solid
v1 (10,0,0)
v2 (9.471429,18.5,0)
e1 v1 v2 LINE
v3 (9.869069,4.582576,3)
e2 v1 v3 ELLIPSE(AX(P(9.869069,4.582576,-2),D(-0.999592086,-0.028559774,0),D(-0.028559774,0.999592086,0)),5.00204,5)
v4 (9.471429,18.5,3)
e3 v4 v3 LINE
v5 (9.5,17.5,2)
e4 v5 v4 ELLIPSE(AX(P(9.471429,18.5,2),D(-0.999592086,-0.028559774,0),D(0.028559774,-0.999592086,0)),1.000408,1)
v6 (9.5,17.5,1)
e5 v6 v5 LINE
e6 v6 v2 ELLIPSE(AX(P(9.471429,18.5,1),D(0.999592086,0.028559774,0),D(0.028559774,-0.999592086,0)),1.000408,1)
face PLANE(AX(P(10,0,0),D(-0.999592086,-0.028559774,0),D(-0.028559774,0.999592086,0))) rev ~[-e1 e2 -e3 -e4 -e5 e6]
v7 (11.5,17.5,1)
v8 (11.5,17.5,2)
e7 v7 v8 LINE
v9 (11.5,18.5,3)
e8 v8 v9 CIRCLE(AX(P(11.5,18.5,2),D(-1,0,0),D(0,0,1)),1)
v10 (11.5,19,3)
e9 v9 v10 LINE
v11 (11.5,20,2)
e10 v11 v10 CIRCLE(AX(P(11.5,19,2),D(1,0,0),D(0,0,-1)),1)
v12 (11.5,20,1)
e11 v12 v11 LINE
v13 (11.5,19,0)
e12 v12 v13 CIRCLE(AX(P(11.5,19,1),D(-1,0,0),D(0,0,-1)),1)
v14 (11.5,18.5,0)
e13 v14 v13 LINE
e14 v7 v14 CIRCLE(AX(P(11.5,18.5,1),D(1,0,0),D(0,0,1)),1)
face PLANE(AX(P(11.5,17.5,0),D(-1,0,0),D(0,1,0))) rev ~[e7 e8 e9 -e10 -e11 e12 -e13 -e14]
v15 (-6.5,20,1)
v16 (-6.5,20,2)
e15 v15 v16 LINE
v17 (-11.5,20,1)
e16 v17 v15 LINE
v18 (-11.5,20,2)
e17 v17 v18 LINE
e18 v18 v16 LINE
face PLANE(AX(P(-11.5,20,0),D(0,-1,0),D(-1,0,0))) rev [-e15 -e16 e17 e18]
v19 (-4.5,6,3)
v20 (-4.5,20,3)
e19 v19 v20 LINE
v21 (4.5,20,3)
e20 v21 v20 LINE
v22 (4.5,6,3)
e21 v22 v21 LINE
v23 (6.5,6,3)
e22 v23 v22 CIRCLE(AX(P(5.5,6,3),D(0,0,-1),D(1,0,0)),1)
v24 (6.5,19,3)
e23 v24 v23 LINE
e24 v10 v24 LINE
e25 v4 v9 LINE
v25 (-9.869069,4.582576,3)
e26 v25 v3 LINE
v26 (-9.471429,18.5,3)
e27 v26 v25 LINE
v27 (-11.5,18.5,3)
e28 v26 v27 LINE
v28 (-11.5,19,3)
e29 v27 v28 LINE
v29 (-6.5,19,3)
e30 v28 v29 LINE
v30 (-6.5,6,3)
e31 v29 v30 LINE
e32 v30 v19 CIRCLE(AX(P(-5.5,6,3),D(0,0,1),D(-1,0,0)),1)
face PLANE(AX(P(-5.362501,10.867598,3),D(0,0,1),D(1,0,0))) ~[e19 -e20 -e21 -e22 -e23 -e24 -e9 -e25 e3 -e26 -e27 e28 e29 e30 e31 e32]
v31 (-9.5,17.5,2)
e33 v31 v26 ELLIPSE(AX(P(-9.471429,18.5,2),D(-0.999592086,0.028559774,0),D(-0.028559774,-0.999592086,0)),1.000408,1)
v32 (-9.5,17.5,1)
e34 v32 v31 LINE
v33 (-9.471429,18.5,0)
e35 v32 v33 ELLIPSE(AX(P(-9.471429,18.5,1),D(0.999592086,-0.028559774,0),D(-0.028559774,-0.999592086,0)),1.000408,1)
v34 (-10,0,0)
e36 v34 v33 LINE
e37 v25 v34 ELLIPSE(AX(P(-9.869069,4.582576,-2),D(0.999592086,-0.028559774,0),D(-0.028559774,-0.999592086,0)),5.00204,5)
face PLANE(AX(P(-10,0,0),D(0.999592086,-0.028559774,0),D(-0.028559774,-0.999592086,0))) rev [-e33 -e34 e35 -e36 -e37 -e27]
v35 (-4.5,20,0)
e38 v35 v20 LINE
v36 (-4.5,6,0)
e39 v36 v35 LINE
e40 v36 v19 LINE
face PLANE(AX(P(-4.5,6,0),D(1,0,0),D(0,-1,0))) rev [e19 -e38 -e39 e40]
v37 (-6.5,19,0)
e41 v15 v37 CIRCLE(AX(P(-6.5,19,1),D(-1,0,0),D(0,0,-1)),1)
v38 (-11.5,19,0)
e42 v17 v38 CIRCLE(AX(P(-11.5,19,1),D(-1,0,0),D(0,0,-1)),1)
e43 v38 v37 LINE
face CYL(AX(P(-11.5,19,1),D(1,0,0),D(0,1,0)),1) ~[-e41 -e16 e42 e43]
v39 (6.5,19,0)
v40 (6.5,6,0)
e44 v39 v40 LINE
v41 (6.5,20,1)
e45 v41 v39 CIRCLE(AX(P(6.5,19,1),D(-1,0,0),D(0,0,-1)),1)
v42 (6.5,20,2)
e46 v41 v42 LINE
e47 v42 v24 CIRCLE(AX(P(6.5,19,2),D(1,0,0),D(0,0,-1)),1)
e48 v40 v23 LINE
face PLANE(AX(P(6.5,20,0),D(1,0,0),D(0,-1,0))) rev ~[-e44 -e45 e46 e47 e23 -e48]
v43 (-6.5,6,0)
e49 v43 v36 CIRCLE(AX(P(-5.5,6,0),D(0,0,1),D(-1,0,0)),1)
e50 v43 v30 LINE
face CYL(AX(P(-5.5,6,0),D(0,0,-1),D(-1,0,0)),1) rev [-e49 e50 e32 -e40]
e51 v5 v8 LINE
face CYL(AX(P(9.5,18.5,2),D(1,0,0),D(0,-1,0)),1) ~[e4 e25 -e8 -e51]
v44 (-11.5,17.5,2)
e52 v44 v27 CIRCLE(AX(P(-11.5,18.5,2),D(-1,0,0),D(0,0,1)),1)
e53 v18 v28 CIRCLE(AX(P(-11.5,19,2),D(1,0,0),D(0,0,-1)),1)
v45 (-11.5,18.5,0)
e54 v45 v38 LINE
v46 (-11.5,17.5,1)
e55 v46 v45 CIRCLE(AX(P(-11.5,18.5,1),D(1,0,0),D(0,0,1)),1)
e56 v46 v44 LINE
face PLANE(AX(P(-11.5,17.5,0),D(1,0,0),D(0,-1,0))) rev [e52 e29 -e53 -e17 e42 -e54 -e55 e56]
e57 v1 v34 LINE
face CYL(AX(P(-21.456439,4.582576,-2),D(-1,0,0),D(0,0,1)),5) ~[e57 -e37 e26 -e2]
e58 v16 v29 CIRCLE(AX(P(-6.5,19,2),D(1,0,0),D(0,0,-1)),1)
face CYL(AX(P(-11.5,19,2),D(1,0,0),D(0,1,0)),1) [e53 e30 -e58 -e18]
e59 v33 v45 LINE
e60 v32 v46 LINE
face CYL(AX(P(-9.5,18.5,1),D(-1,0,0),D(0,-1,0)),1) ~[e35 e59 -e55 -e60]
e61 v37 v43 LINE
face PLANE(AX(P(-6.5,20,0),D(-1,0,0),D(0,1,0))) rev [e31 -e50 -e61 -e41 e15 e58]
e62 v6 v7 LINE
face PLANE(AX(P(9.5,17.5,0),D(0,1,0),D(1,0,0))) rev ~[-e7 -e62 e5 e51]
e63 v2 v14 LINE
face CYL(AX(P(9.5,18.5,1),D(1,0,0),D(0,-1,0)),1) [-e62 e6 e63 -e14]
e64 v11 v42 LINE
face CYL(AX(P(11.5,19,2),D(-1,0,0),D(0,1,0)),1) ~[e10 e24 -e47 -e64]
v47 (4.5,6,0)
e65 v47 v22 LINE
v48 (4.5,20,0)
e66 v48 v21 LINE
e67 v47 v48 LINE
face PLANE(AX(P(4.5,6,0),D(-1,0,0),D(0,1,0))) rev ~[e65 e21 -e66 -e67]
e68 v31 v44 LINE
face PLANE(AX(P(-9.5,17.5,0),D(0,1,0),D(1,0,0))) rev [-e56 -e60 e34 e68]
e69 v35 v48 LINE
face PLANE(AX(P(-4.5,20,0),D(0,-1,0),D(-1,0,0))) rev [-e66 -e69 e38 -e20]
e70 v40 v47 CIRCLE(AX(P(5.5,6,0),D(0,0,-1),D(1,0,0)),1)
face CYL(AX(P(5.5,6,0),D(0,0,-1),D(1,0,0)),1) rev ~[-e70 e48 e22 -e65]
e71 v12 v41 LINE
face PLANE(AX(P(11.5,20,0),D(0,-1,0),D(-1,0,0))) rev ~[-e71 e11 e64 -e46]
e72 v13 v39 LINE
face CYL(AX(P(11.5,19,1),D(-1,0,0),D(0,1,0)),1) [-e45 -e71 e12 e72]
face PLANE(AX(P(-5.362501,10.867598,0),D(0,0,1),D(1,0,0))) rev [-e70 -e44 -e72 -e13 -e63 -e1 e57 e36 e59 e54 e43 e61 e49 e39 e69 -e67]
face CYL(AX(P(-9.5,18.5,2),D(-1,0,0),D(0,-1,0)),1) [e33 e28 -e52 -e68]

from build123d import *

# Parameters (mm, degrees)
F4_DEPTH    = 3
F1_R        = 1
F3_T1_DEPTH = 42.9128784748


# Not quite as in the source:
# - a fillet or chamfer that OpenCascade refuses, or shapes differently, is made with other operations: its cross-section is extruded or revolved along the edge and cut away or added


with BuildPart() as f4:
    # F0 (on Top) → F4 (new body)
    with BuildSketch(Plane.XY):
        with BuildLine():
            Line((0, 20), (0, 0))
            Line((0, 0), (10, 0))
            Line((10, 0), (9.5, 17.5))
            Line((9.5, 17.5), (11.5, 17.5))
            Line((11.5, 17.5), (11.5, 20))
            Line((11.5, 20), (6.5, 20))
            Line((6.5, 20), (6.5, 6))
            ThreePointArc((6.5, 6), (5.5, 5), (4.5, 6))
            Line((4.5, 6), (4.5, 20))
            Line((4.5, 20), (0, 20))
        make_face()
    extrude(amount=F4_DEPTH)

    # F1
    f1_edges = [f4.edges().sort_by_distance(p)[0] for p in [
        (10.5, 17.5, 3),
        (9, 20, 3),
        (10.5, 17.5, 0),
        (9, 20, 0),
    ]]
    fillet(f1_edges, radius=F1_R)

    # F2: F4 across plane


with BuildPart() as f4_1:
    add(f4.part)
    add(f4.part.mirror(Plane.YZ))

    # F3: fillet of radius 5 on 1 edges, made by hand

    # F3_s2 → F3_t1 (cut)
    with BuildSketch(Plane.YZ.offset(-21.4564392374)):
        with BuildLine():
            ThreePointArc((4.582575695, 3), (1.8439629074, 2.1833001327), (0, 0))
            Line((0, 0), (0, 3))
            Line((0, 3), (4.582575695, 3))
        make_face()
    extrude(amount=F3_T1_DEPTH, mode=Mode.SUBTRACT)


solid = f4_1.part
